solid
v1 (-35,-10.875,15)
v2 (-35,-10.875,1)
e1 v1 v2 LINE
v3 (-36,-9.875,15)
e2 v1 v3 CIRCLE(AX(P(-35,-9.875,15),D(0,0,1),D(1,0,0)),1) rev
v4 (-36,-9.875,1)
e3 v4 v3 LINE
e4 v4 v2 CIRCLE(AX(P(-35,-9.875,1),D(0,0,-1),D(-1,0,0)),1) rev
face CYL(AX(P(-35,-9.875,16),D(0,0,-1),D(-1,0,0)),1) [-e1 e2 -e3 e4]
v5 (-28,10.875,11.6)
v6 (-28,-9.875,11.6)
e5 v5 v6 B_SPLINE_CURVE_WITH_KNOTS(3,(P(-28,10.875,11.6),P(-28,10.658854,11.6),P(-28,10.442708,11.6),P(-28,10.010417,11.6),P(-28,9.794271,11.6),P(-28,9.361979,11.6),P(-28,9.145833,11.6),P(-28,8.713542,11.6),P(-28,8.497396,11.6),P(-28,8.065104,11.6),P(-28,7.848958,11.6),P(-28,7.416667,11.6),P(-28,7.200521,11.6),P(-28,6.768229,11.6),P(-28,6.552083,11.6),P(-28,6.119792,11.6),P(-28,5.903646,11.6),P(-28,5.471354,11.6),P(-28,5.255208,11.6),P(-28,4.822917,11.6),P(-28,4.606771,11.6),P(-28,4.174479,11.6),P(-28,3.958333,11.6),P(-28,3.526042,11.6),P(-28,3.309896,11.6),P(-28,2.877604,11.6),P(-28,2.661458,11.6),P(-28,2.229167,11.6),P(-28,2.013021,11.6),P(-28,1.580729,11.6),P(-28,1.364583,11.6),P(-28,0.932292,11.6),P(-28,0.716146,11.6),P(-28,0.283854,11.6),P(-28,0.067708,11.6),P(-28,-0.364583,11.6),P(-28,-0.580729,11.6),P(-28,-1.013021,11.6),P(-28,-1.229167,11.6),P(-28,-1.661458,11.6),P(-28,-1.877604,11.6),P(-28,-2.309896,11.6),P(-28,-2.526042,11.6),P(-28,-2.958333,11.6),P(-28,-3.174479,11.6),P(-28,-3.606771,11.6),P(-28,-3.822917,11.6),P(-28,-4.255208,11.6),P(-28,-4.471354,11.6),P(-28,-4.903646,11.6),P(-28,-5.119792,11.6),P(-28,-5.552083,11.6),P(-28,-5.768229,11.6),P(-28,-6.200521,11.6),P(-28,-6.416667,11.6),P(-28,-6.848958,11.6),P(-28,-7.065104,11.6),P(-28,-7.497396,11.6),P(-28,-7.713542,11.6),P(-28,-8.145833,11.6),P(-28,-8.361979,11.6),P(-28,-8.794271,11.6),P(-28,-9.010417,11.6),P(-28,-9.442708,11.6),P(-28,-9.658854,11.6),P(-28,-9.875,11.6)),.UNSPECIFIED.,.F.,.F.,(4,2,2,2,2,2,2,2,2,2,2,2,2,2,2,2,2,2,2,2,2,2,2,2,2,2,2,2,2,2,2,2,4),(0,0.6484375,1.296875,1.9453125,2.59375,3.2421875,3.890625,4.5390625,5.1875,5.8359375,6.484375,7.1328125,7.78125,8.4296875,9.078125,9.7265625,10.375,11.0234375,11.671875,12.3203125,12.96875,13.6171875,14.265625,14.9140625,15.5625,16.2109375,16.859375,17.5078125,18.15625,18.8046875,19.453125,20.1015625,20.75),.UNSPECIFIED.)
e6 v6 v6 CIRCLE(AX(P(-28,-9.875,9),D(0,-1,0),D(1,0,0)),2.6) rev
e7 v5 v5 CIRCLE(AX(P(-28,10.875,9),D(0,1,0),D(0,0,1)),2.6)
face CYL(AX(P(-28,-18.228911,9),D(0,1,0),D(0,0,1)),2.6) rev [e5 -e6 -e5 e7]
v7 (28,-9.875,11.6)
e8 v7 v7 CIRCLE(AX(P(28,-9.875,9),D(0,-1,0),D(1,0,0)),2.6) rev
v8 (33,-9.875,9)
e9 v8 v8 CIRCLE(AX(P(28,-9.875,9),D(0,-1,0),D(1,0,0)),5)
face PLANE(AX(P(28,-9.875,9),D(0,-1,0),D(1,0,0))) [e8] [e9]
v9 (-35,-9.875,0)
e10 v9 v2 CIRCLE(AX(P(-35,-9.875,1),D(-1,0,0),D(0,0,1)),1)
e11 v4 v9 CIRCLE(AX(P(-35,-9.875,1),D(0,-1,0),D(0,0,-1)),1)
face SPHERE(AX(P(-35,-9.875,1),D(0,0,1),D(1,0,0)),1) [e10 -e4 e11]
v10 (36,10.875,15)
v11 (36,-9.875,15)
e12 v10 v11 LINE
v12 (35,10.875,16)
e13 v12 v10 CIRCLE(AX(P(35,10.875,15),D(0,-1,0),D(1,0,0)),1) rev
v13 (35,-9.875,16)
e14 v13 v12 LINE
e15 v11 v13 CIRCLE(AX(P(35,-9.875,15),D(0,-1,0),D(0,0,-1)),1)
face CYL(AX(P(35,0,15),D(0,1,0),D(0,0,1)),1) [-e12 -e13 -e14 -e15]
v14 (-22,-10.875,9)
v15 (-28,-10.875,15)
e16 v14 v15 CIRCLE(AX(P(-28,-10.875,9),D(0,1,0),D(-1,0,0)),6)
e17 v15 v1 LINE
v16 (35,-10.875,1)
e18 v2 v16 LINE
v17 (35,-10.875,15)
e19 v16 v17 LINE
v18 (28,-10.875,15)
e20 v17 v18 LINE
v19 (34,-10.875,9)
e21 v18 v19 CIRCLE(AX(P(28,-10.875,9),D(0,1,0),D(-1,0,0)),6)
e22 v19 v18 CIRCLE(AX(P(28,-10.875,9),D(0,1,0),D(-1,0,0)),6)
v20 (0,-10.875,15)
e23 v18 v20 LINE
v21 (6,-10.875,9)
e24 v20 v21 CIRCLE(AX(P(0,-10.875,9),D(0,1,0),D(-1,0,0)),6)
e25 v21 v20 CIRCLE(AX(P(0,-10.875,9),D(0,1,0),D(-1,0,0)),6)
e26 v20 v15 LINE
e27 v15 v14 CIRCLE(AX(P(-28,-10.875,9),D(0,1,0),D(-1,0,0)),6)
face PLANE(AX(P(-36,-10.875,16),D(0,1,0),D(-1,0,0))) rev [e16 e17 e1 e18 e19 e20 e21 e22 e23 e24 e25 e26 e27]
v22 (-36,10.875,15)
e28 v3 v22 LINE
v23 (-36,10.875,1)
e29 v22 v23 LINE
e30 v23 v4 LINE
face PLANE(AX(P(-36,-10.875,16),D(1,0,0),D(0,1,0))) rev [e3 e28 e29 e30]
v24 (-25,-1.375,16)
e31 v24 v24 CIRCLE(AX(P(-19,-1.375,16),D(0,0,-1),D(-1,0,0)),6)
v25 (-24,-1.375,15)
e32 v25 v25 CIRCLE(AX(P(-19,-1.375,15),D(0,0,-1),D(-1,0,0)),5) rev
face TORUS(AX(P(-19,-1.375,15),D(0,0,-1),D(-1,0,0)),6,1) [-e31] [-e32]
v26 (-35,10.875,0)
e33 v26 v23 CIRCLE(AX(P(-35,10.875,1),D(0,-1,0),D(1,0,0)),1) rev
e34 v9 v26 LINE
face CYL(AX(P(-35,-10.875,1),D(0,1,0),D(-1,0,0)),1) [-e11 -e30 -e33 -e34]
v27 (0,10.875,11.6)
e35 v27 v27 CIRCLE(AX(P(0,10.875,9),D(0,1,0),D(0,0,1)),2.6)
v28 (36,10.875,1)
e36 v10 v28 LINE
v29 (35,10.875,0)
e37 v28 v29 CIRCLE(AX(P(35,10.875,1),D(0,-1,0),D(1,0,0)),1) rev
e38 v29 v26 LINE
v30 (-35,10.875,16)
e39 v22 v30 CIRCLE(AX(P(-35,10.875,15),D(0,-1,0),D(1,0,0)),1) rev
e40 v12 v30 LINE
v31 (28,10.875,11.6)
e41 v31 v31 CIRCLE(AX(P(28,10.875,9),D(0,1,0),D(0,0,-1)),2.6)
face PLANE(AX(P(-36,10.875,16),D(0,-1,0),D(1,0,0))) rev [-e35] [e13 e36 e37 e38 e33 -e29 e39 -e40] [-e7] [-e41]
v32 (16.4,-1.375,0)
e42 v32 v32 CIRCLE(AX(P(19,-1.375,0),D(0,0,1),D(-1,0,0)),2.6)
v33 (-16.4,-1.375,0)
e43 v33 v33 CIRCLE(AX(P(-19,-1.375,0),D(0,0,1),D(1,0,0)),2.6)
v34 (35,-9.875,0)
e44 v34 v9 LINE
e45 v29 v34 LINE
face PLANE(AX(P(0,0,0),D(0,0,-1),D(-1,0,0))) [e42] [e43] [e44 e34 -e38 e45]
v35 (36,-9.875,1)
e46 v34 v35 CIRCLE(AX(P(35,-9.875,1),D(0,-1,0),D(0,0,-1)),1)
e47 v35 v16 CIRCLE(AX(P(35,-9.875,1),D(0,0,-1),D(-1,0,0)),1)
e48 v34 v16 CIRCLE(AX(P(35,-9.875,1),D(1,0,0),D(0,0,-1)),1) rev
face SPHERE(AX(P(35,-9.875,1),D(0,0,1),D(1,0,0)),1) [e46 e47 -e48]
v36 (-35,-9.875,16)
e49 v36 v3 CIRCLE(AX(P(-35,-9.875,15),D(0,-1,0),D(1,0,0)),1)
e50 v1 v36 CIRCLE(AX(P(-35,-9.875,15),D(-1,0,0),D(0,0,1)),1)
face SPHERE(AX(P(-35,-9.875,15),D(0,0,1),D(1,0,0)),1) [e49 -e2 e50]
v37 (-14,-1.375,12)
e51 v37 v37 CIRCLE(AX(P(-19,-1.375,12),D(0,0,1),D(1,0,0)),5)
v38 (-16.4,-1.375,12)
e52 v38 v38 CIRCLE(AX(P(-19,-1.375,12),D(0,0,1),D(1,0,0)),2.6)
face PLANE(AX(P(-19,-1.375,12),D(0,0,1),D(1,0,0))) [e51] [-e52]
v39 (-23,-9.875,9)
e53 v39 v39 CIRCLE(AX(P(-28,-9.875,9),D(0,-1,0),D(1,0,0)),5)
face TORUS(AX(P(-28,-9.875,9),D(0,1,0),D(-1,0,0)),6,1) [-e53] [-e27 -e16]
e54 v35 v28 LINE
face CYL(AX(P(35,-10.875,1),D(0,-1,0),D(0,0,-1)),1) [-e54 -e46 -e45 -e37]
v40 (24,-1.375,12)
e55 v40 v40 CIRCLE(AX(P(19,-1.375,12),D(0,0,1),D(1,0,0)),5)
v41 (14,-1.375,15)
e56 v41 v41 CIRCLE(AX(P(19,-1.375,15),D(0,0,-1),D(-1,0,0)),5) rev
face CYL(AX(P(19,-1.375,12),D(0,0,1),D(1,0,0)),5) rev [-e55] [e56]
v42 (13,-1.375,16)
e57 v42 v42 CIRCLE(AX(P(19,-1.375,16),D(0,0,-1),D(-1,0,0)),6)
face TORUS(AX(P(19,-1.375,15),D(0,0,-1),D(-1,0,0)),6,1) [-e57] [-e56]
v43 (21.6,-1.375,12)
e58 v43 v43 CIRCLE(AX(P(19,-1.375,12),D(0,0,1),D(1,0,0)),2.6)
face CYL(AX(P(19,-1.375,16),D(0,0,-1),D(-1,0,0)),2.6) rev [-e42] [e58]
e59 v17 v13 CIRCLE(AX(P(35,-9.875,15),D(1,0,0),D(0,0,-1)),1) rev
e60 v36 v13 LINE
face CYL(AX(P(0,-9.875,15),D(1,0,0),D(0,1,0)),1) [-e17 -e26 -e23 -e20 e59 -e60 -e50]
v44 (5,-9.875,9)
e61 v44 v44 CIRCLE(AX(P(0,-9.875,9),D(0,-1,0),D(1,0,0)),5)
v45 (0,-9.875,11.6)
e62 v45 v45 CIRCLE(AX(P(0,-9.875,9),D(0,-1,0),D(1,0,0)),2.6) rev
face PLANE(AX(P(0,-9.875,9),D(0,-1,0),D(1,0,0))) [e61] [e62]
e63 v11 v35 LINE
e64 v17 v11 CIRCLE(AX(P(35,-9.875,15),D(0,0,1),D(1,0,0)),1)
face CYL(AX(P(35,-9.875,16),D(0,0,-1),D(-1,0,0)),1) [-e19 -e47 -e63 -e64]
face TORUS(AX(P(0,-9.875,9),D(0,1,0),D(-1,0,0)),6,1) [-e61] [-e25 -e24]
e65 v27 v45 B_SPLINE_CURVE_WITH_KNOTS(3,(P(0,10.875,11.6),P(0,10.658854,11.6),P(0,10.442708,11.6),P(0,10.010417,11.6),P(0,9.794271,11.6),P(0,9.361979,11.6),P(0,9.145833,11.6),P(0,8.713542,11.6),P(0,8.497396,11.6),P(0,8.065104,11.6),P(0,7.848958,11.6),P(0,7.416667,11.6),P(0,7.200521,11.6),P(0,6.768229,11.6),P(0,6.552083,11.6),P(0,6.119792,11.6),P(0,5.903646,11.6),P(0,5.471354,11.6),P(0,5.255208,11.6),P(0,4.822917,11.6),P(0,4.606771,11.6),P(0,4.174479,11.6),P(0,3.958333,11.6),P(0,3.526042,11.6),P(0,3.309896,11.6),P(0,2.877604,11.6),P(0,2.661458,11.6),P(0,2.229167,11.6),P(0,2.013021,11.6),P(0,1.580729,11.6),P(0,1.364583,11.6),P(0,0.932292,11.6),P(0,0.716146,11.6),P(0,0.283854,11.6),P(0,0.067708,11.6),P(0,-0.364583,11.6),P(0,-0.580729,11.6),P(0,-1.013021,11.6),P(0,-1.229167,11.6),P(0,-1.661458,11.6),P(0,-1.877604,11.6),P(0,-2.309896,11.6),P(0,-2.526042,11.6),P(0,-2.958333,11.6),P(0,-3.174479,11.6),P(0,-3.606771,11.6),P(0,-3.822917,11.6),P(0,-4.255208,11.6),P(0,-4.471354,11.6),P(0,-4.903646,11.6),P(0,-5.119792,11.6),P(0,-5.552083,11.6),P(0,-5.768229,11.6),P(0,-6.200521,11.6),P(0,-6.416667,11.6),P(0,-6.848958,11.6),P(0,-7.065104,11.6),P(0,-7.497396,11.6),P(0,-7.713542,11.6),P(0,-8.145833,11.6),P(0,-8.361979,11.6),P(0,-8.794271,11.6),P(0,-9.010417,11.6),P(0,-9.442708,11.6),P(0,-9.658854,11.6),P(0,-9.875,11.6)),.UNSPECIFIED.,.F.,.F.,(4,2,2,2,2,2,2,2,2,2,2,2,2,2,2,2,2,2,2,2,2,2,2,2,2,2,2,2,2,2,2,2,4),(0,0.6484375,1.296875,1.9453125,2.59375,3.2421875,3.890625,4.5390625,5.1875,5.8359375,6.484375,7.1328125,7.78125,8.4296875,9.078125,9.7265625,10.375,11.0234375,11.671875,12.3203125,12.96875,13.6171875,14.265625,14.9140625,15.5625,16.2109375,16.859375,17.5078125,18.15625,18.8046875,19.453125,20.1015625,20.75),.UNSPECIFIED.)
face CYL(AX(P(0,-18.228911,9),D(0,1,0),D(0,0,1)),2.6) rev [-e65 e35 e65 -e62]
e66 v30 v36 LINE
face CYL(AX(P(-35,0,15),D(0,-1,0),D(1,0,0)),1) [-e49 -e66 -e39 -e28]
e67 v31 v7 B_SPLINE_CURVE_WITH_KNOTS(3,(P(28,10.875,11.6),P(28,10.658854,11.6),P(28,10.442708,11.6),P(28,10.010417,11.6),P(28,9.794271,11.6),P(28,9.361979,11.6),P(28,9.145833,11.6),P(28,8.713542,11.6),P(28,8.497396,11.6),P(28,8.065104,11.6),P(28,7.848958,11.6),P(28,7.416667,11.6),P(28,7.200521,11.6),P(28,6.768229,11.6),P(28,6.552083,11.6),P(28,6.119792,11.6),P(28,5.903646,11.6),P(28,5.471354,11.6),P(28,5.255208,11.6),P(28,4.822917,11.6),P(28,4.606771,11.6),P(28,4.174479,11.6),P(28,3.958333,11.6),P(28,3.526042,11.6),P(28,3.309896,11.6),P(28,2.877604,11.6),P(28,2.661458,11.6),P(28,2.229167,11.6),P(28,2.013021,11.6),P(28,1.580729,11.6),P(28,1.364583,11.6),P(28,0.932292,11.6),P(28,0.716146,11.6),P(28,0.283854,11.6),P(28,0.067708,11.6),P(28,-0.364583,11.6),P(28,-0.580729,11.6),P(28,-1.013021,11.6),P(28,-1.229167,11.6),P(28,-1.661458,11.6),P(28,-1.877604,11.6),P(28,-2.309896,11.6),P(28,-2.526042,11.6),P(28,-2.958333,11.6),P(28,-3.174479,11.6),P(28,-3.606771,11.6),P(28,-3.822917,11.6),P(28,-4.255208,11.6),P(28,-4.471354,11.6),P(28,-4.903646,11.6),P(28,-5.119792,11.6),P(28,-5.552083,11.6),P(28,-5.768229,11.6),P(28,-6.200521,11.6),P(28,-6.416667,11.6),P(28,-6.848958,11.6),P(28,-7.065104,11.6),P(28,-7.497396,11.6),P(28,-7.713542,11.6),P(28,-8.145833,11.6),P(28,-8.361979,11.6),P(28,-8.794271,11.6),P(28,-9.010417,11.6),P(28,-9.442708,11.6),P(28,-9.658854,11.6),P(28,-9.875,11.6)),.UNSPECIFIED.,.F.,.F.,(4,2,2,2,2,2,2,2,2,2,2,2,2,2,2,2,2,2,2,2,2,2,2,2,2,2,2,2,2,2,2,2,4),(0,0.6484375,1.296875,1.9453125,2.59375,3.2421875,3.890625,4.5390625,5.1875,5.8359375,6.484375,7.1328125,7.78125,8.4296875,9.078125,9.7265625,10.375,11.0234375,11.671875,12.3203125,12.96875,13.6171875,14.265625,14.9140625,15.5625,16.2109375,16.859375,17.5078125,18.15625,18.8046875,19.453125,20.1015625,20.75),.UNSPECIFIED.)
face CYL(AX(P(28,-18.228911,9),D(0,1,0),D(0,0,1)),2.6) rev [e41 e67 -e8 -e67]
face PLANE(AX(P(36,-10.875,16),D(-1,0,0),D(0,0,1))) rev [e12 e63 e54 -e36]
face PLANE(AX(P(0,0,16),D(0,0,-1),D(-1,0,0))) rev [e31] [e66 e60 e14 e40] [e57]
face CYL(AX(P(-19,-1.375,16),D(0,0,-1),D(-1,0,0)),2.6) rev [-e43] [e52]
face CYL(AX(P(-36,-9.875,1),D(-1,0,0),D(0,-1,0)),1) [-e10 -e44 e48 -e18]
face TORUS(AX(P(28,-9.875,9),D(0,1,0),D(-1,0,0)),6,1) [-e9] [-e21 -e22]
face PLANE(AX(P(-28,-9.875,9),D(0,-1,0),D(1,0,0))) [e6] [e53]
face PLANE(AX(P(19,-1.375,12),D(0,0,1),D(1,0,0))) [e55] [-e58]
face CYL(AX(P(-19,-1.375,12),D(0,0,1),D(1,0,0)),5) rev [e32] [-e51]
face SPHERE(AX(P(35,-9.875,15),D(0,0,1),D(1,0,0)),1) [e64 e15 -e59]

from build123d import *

# Parameters (mm, degrees)
SKETCH1_W           = 72
SKETCH1_H           = 21.75
SKETCH1_R           = 2.6
BOSS_EXTRUDE1_DEPTH = 16
SKETCH2_R           = 5
CUT_EXTRUDE1_DEPTH  = 4
SKETCH3_R           = 2.6
CUT_EXTRUDE2_DEPTH  = 21.75
SKETCH4_R           = 5
CUT_EXTRUDE3_DEPTH  = 1
FILLET1_R           = 1


with BuildPart() as part:
    # Sketch1 → Boss-Extrude1 (new body)
    with BuildSketch(Plane.XY):
        Rectangle(SKETCH1_W, SKETCH1_H)
        with Locations((-19, -1.375)):
            Circle(SKETCH1_R, mode=Mode.SUBTRACT)
        with Locations(Location((19, -1.375, 0), (0, 0, 180))):
            Circle(SKETCH1_R, mode=Mode.SUBTRACT)
    extrude(amount=BOSS_EXTRUDE1_DEPTH)

    # Sketch2 → Cut-Extrude1 (cut)
    with BuildSketch(Plane.XY.offset(16)):
        with Locations((-19, -1.375)):
            Circle(SKETCH2_R)
        with Locations((19, -1.375)):
            Circle(SKETCH2_R)
    extrude(amount=-CUT_EXTRUDE1_DEPTH, mode=Mode.SUBTRACT)

    # Sketch3 → Cut-Extrude2 (cut)
    with BuildSketch(Plane(origin=(0, 10.875, 0), x_dir=(1, 0, 0), z_dir=(0, 1, 0))):
        with Locations(Location((0, -9, 0), (0, 0, 270))):
            Circle(SKETCH3_R)
        with Locations(Location((-28, -9, 0), (0, 0, 270))):
            Circle(SKETCH3_R)
        with Locations(Location((28, -9, 0), (0, 0, 270))):
            Circle(SKETCH3_R)
    extrude(amount=-CUT_EXTRUDE2_DEPTH, mode=Mode.SUBTRACT)

    # Sketch4 → Cut-Extrude3 (cut)
    with BuildSketch(Plane.XZ.offset(10.875)):
        with Locations((-28, 9)):
            Circle(SKETCH4_R)
        with Locations((0, 9)):
            Circle(SKETCH4_R)
        with Locations((28, 9)):
            Circle(SKETCH4_R)
    extrude(amount=-CUT_EXTRUDE3_DEPTH, mode=Mode.SUBTRACT)

    # Fillet1
    fillet1_edges = [part.edges().sort_by_distance(p)[0] for p in [
        (-36, 0, 16),
        (0, -10.875, 16),
        (-24, -1.375, 16),
        (14, -1.375, 16),
        (36, 0, 16),
        (0, -10.875, 0),
        (-33, -10.875, 9),
        (-36, 0, 0),
        (-5, -10.875, 9),
        (36, 0, 0),
        (23, -10.875, 9),
        (36, -10.875, 8),
        (-36, -10.875, 8),
    ]]
    fillet(fillet1_edges, radius=FILLET1_R - 0.0001)  # a hair under: the kernel refuses the full size


solid = part.part
